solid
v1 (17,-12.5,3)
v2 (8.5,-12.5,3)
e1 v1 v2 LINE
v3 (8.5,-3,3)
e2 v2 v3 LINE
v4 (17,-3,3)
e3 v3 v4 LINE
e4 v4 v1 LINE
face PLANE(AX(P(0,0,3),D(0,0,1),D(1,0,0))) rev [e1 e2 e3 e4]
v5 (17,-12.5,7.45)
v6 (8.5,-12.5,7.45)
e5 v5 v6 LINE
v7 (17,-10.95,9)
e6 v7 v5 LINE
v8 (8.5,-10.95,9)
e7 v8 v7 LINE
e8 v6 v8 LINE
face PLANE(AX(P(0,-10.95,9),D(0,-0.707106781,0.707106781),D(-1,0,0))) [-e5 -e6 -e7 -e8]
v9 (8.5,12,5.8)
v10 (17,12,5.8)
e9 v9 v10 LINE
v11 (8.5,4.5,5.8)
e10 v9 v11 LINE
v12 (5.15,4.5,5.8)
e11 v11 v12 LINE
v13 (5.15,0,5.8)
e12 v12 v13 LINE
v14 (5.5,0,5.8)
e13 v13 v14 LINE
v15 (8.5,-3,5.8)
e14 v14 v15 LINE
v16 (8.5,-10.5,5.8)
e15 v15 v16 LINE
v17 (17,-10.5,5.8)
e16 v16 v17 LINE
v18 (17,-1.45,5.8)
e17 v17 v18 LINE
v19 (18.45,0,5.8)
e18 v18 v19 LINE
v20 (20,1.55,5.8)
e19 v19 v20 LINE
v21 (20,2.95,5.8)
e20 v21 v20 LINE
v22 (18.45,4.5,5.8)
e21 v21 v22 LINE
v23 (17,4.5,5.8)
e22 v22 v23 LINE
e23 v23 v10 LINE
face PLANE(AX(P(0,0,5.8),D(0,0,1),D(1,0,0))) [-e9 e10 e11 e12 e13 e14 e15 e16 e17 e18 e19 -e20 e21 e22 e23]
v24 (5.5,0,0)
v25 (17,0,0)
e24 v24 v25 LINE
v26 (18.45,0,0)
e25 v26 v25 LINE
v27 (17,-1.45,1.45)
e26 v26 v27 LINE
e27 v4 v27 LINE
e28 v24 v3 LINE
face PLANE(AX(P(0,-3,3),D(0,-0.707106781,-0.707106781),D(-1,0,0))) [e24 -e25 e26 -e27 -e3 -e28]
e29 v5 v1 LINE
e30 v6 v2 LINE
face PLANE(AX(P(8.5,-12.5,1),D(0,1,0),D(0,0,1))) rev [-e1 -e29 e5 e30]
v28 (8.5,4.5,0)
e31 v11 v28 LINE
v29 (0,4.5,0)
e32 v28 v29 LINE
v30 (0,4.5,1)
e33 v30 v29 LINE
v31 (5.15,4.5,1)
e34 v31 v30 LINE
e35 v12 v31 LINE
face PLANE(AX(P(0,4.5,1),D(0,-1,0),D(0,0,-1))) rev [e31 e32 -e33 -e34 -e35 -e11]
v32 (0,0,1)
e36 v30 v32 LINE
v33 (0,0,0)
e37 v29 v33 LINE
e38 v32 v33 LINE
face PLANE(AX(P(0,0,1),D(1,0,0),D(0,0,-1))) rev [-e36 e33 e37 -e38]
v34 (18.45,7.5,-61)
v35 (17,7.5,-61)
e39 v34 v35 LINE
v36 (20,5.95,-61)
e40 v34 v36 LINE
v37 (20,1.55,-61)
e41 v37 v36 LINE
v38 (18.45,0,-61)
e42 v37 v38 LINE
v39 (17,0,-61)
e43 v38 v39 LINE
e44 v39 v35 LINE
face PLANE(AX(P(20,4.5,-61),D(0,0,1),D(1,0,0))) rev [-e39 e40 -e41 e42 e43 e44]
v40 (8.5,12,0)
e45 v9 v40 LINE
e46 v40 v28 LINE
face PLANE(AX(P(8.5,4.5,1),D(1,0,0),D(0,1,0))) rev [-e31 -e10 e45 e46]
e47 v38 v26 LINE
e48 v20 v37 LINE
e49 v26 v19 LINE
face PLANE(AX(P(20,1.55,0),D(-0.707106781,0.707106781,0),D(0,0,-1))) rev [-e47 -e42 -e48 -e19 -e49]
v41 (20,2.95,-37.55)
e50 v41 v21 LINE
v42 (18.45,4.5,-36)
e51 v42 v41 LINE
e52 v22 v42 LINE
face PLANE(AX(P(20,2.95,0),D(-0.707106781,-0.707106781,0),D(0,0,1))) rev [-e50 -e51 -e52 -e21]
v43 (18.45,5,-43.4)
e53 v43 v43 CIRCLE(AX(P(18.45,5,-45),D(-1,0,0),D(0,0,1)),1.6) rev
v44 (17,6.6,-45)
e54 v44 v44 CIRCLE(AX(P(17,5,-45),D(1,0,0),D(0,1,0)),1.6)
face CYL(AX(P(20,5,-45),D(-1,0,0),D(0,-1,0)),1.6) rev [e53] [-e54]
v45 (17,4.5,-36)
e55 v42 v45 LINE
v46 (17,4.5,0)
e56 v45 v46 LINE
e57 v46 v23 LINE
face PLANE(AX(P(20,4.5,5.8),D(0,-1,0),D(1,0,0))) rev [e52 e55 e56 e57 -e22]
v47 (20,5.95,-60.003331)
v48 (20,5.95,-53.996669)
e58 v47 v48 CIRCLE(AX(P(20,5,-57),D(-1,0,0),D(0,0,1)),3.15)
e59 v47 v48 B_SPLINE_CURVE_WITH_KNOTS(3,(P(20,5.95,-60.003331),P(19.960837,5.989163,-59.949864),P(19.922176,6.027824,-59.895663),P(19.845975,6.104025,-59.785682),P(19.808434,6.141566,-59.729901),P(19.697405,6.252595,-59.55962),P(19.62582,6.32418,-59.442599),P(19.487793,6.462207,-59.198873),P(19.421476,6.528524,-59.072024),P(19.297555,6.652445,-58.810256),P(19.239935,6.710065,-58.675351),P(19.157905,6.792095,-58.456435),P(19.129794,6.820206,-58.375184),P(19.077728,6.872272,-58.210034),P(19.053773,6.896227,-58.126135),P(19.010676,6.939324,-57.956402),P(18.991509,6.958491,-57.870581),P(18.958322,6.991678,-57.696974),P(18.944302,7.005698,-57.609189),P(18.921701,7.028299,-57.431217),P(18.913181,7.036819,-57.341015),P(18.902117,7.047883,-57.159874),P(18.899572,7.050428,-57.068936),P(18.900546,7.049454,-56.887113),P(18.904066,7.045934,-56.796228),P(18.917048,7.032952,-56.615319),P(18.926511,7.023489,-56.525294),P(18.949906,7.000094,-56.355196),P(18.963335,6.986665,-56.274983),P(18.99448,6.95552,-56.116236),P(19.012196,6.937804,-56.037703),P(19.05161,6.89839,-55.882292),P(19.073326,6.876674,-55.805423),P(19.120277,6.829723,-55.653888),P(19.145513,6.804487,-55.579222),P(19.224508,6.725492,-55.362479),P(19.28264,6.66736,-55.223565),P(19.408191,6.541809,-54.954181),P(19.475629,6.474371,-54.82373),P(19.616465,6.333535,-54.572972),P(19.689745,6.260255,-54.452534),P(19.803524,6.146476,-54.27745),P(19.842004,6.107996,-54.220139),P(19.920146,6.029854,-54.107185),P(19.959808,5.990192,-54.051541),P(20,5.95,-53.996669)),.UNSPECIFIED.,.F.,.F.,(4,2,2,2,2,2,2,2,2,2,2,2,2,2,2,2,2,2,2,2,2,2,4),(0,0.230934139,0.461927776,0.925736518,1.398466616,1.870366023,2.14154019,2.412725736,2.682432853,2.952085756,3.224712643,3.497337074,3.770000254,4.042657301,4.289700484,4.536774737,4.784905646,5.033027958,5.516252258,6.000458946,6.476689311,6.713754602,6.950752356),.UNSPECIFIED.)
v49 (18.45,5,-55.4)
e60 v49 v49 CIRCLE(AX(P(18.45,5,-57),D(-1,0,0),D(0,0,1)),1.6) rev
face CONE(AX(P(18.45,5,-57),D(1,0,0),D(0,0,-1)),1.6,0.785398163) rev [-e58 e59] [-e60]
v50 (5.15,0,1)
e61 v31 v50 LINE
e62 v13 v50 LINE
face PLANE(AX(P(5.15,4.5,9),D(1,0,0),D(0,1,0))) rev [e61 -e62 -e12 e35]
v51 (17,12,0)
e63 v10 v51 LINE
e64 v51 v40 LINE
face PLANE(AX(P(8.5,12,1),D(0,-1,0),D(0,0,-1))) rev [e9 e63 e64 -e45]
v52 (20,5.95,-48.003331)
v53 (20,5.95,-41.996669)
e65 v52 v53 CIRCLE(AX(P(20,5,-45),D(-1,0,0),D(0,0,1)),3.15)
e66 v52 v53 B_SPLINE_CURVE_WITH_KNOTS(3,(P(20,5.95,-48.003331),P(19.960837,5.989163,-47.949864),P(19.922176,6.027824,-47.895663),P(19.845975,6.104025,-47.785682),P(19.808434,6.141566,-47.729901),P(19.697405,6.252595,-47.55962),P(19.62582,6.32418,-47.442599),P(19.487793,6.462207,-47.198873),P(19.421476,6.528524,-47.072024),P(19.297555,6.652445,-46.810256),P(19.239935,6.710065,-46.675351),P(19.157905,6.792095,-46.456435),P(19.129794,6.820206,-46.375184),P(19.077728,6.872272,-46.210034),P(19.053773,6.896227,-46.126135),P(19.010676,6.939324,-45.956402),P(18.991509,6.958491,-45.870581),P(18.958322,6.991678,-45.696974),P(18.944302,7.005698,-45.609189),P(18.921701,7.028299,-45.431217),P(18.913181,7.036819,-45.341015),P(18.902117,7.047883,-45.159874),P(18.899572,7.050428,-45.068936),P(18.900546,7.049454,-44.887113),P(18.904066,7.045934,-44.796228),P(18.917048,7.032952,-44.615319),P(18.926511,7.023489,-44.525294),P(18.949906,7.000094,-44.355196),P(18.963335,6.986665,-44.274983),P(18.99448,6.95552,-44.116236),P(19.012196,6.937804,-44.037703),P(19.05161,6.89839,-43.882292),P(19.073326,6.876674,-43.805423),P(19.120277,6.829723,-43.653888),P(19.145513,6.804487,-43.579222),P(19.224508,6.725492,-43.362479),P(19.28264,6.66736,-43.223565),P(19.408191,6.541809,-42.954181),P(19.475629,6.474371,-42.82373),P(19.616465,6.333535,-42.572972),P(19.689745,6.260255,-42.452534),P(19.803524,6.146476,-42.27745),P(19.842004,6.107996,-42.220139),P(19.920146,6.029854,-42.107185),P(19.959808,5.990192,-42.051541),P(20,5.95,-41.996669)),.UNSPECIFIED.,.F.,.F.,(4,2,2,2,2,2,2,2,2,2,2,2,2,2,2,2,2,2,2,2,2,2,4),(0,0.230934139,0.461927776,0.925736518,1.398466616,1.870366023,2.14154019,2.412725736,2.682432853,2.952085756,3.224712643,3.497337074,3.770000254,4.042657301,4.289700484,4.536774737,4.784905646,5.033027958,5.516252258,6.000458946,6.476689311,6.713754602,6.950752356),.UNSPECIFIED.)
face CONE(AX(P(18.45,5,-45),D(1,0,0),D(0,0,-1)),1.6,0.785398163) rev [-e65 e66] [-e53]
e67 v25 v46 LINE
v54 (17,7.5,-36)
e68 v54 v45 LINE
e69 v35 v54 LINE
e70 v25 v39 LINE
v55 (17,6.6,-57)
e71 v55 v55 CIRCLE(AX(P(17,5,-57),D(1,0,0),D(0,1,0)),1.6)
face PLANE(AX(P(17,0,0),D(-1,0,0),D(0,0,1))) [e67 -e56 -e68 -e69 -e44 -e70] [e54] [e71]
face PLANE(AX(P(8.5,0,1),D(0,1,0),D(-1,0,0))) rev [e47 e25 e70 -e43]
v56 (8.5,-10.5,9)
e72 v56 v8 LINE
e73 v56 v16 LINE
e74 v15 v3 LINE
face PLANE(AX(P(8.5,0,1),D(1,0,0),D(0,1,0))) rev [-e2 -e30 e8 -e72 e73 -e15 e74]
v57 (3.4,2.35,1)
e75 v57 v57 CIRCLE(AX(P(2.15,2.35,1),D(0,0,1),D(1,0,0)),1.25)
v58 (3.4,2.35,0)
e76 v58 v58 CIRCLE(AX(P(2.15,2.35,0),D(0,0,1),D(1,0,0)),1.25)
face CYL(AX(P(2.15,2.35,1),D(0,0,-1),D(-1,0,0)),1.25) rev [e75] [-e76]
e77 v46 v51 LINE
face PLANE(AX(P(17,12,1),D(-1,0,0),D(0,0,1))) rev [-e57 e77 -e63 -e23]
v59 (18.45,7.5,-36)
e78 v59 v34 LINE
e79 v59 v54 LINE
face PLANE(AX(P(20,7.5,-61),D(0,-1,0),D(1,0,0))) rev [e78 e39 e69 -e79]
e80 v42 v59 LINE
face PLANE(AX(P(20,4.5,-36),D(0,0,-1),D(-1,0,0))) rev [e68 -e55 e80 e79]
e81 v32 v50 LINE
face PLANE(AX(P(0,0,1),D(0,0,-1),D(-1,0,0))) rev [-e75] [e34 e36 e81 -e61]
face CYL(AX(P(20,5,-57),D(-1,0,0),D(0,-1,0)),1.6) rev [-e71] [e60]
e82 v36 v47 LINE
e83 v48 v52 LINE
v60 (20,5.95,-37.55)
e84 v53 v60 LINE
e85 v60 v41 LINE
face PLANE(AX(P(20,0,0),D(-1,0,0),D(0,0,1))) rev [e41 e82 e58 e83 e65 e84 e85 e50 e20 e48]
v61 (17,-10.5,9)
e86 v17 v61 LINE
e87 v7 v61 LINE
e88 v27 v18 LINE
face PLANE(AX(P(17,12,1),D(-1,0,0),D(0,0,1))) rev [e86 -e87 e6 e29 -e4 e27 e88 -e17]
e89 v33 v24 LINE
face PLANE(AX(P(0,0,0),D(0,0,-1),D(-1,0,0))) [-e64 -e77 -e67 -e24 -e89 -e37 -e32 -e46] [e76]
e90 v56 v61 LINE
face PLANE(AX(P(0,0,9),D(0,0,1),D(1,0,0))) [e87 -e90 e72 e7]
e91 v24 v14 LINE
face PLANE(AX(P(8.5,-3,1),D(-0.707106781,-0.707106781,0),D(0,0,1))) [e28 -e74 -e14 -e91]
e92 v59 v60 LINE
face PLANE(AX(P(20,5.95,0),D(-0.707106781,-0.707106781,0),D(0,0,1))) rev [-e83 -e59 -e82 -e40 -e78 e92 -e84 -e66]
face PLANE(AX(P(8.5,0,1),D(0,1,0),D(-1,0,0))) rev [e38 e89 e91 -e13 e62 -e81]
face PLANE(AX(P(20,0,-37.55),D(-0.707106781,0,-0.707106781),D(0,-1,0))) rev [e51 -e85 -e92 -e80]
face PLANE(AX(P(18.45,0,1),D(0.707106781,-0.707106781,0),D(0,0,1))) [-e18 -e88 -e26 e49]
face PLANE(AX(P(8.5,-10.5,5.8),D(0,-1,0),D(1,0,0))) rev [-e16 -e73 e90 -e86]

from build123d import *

# Parameters (mm, degrees)
SKETCH1_R           = 1.25
BOSS_EXTRUDE1_DEPTH = 1
BOSS_EXTRUDE2_DEPTH = 8
CUT_EXTRUDE1_DEPTH  = 3.2
SKETCH4_R           = 1.6
BOSS_EXTRUDE3_DEPTH = 3
CHAMFER1_SIZE       = 1.55
CHAMFER2_SIZE       = 1.55
CHAMFER3_SIZE       = 1.55
SKETCH5_W           = 8.5
SKETCH5_H           = 12.5
CUT_EXTRUDE2_DEPTH  = 3
CHAMFER4_SIZE       = 3
CHAMFER5_SIZE       = 1.45
SKETCH6_W           = 8.5
SKETCH6_H           = 3.2
CUT_EXTRUDE3_DEPTH  = 69.023892861


# Some blends are built 0.0001 mm under size
with BuildPart() as part:
    # Sketch1 → Boss-Extrude1 (new body)
    with BuildSketch(Plane.XY):
        Polygon((0, 0), (0, 4.5), (8.5, 4.5), (8.5, 12), (17, 12), (17, 0), (17, -12.5), (8.5, -12.5), (8.5, 0), align=None)
        with Locations((2.15, 2.35)):
            Circle(SKETCH1_R, mode=Mode.SUBTRACT)
    extrude(amount=BOSS_EXTRUDE1_DEPTH)

    # Sketch2 → Boss-Extrude2 (add)
    with BuildSketch(Plane.XY.offset(1)):
        Polygon((5.15, 4.5), (5.15, 0), (8.5, 0), (8.5, -12.5), (17, -12.5), (17, 12), (8.5, 12), (8.5, 4.5), align=None)
    extrude(amount=BOSS_EXTRUDE2_DEPTH)

    # Sketch3 → Cut-Extrude1 (cut)
    with BuildSketch(Plane.XY.offset(9)):
        Polygon((8.5, 10), (17, 10), (17, -10.5), (8.5, -10.5), (5.15, -10.5), (5.15, 4.5), (8.5, 4.5), align=None)
    extrude(amount=-CUT_EXTRUDE1_DEPTH, mode=Mode.SUBTRACT)

    # Sketch4 → Boss-Extrude3 (add)
    with BuildSketch(Plane(origin=(17, 0, 0), x_dir=(0, 0, -1), z_dir=(1, 0, 0))):
        Polygon((-5.8, 0), (61, 0), (61, 4.5), (61, 7.5), (36, 7.5), (36, 4.5), (-5.8, 4.5), align=None)
        with Locations(Location((57, 5, 0), (0, 0, 90))):
            Circle(SKETCH4_R, mode=Mode.SUBTRACT)
        with Locations(Location((45, 5, 0), (0, 0, 90))):
            Circle(SKETCH4_R, mode=Mode.SUBTRACT)
    extrude(amount=BOSS_EXTRUDE3_DEPTH)

    # Chamfer1
    # the kernel refuses this chamfer: 1.55 mm, written as the material it takes off along each edge
    with BuildSketch(Plane(origin=(20, 5, -57), x_dir=(0, 1, 0), z_dir=(0, 0, -1))) as chamfer1_piece_1:
        Polygon((1.6, -CHAMFER1_SIZE), (1.6 + CHAMFER1_SIZE, 0), (1.6, 0), align=None)
    revolve(axis=Axis((20, 5, -57), (1, 0, 0)), mode=Mode.SUBTRACT)
    with BuildSketch(Plane(origin=(20, 5, -45), x_dir=(0, 1, 0), z_dir=(0, 0, -1))) as chamfer1_piece_2:
        Polygon((1.6, -CHAMFER1_SIZE), (1.6 + CHAMFER1_SIZE, 0), (1.6, 0), align=None)
    revolve(axis=Axis((20, 5, -45), (1, 0, 0)), mode=Mode.SUBTRACT)

    # Chamfer2
    # the kernel refuses this chamfer: 1.55 mm, written as the material it takes off along each edge
    with BuildSketch(Plane(origin=(20, 7.5, -59.069731842), x_dir=(0.027495876610587087, -0.9996219169112966, 0), z_dir=(0, 0, 1))) as chamfer2_piece_1:
        Polygon((CHAMFER2_SIZE * 0.999621916911, -CHAMFER2_SIZE * 0.0274958766106), (-CHAMFER2_SIZE * 0.0274958766106, -CHAMFER2_SIZE * 0.999621916911), (0, 0), align=None)
    extrude(amount=16.139463683, mode=Mode.SUBTRACT)
    with BuildSketch(Plane(origin=(20, 7.5, -47.069731842), x_dir=(0.027495876610587087, -0.9996219169112966, 0), z_dir=(0, 0, 1))) as chamfer2_piece_2:
        Polygon((CHAMFER2_SIZE * 0.999621916911, -CHAMFER2_SIZE * 0.0274958766106), (-CHAMFER2_SIZE * 0.0274958766106, -CHAMFER2_SIZE * 0.999621916911), (0, 0), align=None)
    extrude(amount=15.055840473, mode=Mode.SUBTRACT)
    with BuildSketch(Plane(origin=(20.986108631, 12, 9), x_dir=(0, 0.02749587661058596, -0.9996219169112966), z_dir=(-1, 0, 0))) as chamfer2_piece_3:
        Polygon((CHAMFER2_SIZE * 0.999621916911, CHAMFER2_SIZE * 0.0274958766106), (-CHAMFER2_SIZE * 0.0274958766106, CHAMFER2_SIZE * 0.999621916911), (0, 0), align=None)
    extrude(amount=16.472217263, mode=Mode.SUBTRACT)
    with BuildSketch(Plane(origin=(20, 7.5, -64.986108631), x_dir=(0.027495876610587087, -0.9996219169112966, 0), z_dir=(0, 0, 1))) as chamfer2_piece_4:
        Polygon((CHAMFER2_SIZE * 0.999621916911, -CHAMFER2_SIZE * 0.0274958766106), (-CHAMFER2_SIZE * 0.0274958766106, -CHAMFER2_SIZE * 0.999621916911), (0, 0), align=None)
    extrude(amount=10.055840473, mode=Mode.SUBTRACT)
    with BuildSketch(Plane(origin=(20, 11.486108631, -36), x_dir=(0.027495876610587163, 0, -0.9996219169112966), z_dir=(0, -1, 0))) as chamfer2_piece_5:
        Polygon((CHAMFER2_SIZE * 0.999621916911, -CHAMFER2_SIZE * 0.0274958766106), (-CHAMFER2_SIZE * 0.0274958766106, -CHAMFER2_SIZE * 0.999621916911), (0, 0), align=None)
    extrude(amount=6.986108631, mode=Mode.SUBTRACT)
    with BuildSketch(Plane(origin=(20, 4.5, -36), x_dir=(-0.9996219169112966, 0.027495876610585928, 0), z_dir=(0, 0, 1))) as chamfer2_piece_6:
        Polygon((CHAMFER2_SIZE * 0.999621916911, CHAMFER2_SIZE * 0.0274958766106), (-CHAMFER2_SIZE * 0.0274958766106, CHAMFER2_SIZE * 0.999621916911), (0, 0), align=None)
    extrude(amount=45.786108631, mode=Mode.SUBTRACT)
    with BuildSketch(Plane(origin=(20, 4.5, -39.986108631), x_dir=(-0.9996219169112966, 0.027495876610585928, 0), z_dir=(0, 0, 1))) as chamfer2_piece_7a_section:
        Polygon((CHAMFER2_SIZE * 0.999621916911, CHAMFER2_SIZE * 0.0274958766106), (-CHAMFER2_SIZE * 0.0274958766106, CHAMFER2_SIZE * 0.999621916911), (0, 0), align=None)
    chamfer2_piece_7a = extrude(amount=49.772217263, mode=Mode.PRIVATE)
    chamfer2_piece_7a = split(chamfer2_piece_7a, bisect_by=Plane(origin=(19.488819878, 3.988819878, -36), z_dir=(0, 0, -1)), keep=Keep.TOP, mode=Mode.PRIVATE)
    with BuildSketch(Plane(origin=(20, 11.486108631, -36), x_dir=(0.027495876610587163, 0, -0.9996219169112966), z_dir=(0, -1, 0))) as chamfer2_piece_7b_section:
        Polygon((CHAMFER2_SIZE * 0.999621916911, -CHAMFER2_SIZE * 0.0274958766106), (-CHAMFER2_SIZE * 0.0274958766106, -CHAMFER2_SIZE * 0.999621916911), (0, 0), align=None)
    chamfer2_piece_7b = extrude(amount=10.972217263, mode=Mode.PRIVATE)
    chamfer2_piece_7b = split(chamfer2_piece_7b, bisect_by=Plane(origin=(19.488819878, 4.5, -36.511180122), z_dir=(0, -1, 0)), keep=Keep.TOP, mode=Mode.PRIVATE)
    chamfer2_piece_7 = chamfer2_piece_7a & chamfer2_piece_7b
    add(chamfer2_piece_7, mode=Mode.SUBTRACT)

    # Chamfer3
    chamfer3_edges = [part.edges().sort_by_distance(p)[0] for p in [
        (12.75, -12.5, 9),
        (20, 0, -27.6),
    ]]
    chamfer(chamfer3_edges, length=CHAMFER3_SIZE)

    # Sketch5 → Cut-Extrude2 (cut)
    with BuildSketch(Plane(origin=(0, 0, 0), x_dir=(-1, 0, 0), z_dir=(0, 0, -1))):
        with Locations((-12.75, -6.25)):
            Rectangle(SKETCH5_W, SKETCH5_H)
    extrude(amount=-CUT_EXTRUDE2_DEPTH, mode=Mode.SUBTRACT)

    # Chamfer4
    chamfer4_edges = [part.edges().sort_by_distance(p)[0] for p in [
        (12.75, 0, 3),
        (8.5, 0, 4.4),
    ]]
    chamfer(chamfer4_edges, length=CHAMFER4_SIZE - 0.0001)  # a hair under: the kernel refuses the full size

    # Chamfer5
    chamfer5_edges = [part.edges().sort_by_distance(p)[0] for p in [
        (17, 0, 2.90005),
    ]]
    chamfer(chamfer5_edges, length=CHAMFER5_SIZE - 0.0001)  # a hair under: the kernel refuses the full size
    chamfer5_2_edges = [part.edges().sort_by_distance(p)[0] for p in [
        (18.44995, 0, 5.8),
    ]]
    chamfer(chamfer5_2_edges, length=CHAMFER5_SIZE)

    # Sketch6 → Cut-Extrude3 (cut, through all)
    with BuildSketch(Plane.XZ.offset(-10)):
        with Locations((12.75, 7.4)):
            Rectangle(SKETCH6_W, SKETCH6_H)
    extrude(amount=-CUT_EXTRUDE3_DEPTH, mode=Mode.SUBTRACT)


solid = part.part
